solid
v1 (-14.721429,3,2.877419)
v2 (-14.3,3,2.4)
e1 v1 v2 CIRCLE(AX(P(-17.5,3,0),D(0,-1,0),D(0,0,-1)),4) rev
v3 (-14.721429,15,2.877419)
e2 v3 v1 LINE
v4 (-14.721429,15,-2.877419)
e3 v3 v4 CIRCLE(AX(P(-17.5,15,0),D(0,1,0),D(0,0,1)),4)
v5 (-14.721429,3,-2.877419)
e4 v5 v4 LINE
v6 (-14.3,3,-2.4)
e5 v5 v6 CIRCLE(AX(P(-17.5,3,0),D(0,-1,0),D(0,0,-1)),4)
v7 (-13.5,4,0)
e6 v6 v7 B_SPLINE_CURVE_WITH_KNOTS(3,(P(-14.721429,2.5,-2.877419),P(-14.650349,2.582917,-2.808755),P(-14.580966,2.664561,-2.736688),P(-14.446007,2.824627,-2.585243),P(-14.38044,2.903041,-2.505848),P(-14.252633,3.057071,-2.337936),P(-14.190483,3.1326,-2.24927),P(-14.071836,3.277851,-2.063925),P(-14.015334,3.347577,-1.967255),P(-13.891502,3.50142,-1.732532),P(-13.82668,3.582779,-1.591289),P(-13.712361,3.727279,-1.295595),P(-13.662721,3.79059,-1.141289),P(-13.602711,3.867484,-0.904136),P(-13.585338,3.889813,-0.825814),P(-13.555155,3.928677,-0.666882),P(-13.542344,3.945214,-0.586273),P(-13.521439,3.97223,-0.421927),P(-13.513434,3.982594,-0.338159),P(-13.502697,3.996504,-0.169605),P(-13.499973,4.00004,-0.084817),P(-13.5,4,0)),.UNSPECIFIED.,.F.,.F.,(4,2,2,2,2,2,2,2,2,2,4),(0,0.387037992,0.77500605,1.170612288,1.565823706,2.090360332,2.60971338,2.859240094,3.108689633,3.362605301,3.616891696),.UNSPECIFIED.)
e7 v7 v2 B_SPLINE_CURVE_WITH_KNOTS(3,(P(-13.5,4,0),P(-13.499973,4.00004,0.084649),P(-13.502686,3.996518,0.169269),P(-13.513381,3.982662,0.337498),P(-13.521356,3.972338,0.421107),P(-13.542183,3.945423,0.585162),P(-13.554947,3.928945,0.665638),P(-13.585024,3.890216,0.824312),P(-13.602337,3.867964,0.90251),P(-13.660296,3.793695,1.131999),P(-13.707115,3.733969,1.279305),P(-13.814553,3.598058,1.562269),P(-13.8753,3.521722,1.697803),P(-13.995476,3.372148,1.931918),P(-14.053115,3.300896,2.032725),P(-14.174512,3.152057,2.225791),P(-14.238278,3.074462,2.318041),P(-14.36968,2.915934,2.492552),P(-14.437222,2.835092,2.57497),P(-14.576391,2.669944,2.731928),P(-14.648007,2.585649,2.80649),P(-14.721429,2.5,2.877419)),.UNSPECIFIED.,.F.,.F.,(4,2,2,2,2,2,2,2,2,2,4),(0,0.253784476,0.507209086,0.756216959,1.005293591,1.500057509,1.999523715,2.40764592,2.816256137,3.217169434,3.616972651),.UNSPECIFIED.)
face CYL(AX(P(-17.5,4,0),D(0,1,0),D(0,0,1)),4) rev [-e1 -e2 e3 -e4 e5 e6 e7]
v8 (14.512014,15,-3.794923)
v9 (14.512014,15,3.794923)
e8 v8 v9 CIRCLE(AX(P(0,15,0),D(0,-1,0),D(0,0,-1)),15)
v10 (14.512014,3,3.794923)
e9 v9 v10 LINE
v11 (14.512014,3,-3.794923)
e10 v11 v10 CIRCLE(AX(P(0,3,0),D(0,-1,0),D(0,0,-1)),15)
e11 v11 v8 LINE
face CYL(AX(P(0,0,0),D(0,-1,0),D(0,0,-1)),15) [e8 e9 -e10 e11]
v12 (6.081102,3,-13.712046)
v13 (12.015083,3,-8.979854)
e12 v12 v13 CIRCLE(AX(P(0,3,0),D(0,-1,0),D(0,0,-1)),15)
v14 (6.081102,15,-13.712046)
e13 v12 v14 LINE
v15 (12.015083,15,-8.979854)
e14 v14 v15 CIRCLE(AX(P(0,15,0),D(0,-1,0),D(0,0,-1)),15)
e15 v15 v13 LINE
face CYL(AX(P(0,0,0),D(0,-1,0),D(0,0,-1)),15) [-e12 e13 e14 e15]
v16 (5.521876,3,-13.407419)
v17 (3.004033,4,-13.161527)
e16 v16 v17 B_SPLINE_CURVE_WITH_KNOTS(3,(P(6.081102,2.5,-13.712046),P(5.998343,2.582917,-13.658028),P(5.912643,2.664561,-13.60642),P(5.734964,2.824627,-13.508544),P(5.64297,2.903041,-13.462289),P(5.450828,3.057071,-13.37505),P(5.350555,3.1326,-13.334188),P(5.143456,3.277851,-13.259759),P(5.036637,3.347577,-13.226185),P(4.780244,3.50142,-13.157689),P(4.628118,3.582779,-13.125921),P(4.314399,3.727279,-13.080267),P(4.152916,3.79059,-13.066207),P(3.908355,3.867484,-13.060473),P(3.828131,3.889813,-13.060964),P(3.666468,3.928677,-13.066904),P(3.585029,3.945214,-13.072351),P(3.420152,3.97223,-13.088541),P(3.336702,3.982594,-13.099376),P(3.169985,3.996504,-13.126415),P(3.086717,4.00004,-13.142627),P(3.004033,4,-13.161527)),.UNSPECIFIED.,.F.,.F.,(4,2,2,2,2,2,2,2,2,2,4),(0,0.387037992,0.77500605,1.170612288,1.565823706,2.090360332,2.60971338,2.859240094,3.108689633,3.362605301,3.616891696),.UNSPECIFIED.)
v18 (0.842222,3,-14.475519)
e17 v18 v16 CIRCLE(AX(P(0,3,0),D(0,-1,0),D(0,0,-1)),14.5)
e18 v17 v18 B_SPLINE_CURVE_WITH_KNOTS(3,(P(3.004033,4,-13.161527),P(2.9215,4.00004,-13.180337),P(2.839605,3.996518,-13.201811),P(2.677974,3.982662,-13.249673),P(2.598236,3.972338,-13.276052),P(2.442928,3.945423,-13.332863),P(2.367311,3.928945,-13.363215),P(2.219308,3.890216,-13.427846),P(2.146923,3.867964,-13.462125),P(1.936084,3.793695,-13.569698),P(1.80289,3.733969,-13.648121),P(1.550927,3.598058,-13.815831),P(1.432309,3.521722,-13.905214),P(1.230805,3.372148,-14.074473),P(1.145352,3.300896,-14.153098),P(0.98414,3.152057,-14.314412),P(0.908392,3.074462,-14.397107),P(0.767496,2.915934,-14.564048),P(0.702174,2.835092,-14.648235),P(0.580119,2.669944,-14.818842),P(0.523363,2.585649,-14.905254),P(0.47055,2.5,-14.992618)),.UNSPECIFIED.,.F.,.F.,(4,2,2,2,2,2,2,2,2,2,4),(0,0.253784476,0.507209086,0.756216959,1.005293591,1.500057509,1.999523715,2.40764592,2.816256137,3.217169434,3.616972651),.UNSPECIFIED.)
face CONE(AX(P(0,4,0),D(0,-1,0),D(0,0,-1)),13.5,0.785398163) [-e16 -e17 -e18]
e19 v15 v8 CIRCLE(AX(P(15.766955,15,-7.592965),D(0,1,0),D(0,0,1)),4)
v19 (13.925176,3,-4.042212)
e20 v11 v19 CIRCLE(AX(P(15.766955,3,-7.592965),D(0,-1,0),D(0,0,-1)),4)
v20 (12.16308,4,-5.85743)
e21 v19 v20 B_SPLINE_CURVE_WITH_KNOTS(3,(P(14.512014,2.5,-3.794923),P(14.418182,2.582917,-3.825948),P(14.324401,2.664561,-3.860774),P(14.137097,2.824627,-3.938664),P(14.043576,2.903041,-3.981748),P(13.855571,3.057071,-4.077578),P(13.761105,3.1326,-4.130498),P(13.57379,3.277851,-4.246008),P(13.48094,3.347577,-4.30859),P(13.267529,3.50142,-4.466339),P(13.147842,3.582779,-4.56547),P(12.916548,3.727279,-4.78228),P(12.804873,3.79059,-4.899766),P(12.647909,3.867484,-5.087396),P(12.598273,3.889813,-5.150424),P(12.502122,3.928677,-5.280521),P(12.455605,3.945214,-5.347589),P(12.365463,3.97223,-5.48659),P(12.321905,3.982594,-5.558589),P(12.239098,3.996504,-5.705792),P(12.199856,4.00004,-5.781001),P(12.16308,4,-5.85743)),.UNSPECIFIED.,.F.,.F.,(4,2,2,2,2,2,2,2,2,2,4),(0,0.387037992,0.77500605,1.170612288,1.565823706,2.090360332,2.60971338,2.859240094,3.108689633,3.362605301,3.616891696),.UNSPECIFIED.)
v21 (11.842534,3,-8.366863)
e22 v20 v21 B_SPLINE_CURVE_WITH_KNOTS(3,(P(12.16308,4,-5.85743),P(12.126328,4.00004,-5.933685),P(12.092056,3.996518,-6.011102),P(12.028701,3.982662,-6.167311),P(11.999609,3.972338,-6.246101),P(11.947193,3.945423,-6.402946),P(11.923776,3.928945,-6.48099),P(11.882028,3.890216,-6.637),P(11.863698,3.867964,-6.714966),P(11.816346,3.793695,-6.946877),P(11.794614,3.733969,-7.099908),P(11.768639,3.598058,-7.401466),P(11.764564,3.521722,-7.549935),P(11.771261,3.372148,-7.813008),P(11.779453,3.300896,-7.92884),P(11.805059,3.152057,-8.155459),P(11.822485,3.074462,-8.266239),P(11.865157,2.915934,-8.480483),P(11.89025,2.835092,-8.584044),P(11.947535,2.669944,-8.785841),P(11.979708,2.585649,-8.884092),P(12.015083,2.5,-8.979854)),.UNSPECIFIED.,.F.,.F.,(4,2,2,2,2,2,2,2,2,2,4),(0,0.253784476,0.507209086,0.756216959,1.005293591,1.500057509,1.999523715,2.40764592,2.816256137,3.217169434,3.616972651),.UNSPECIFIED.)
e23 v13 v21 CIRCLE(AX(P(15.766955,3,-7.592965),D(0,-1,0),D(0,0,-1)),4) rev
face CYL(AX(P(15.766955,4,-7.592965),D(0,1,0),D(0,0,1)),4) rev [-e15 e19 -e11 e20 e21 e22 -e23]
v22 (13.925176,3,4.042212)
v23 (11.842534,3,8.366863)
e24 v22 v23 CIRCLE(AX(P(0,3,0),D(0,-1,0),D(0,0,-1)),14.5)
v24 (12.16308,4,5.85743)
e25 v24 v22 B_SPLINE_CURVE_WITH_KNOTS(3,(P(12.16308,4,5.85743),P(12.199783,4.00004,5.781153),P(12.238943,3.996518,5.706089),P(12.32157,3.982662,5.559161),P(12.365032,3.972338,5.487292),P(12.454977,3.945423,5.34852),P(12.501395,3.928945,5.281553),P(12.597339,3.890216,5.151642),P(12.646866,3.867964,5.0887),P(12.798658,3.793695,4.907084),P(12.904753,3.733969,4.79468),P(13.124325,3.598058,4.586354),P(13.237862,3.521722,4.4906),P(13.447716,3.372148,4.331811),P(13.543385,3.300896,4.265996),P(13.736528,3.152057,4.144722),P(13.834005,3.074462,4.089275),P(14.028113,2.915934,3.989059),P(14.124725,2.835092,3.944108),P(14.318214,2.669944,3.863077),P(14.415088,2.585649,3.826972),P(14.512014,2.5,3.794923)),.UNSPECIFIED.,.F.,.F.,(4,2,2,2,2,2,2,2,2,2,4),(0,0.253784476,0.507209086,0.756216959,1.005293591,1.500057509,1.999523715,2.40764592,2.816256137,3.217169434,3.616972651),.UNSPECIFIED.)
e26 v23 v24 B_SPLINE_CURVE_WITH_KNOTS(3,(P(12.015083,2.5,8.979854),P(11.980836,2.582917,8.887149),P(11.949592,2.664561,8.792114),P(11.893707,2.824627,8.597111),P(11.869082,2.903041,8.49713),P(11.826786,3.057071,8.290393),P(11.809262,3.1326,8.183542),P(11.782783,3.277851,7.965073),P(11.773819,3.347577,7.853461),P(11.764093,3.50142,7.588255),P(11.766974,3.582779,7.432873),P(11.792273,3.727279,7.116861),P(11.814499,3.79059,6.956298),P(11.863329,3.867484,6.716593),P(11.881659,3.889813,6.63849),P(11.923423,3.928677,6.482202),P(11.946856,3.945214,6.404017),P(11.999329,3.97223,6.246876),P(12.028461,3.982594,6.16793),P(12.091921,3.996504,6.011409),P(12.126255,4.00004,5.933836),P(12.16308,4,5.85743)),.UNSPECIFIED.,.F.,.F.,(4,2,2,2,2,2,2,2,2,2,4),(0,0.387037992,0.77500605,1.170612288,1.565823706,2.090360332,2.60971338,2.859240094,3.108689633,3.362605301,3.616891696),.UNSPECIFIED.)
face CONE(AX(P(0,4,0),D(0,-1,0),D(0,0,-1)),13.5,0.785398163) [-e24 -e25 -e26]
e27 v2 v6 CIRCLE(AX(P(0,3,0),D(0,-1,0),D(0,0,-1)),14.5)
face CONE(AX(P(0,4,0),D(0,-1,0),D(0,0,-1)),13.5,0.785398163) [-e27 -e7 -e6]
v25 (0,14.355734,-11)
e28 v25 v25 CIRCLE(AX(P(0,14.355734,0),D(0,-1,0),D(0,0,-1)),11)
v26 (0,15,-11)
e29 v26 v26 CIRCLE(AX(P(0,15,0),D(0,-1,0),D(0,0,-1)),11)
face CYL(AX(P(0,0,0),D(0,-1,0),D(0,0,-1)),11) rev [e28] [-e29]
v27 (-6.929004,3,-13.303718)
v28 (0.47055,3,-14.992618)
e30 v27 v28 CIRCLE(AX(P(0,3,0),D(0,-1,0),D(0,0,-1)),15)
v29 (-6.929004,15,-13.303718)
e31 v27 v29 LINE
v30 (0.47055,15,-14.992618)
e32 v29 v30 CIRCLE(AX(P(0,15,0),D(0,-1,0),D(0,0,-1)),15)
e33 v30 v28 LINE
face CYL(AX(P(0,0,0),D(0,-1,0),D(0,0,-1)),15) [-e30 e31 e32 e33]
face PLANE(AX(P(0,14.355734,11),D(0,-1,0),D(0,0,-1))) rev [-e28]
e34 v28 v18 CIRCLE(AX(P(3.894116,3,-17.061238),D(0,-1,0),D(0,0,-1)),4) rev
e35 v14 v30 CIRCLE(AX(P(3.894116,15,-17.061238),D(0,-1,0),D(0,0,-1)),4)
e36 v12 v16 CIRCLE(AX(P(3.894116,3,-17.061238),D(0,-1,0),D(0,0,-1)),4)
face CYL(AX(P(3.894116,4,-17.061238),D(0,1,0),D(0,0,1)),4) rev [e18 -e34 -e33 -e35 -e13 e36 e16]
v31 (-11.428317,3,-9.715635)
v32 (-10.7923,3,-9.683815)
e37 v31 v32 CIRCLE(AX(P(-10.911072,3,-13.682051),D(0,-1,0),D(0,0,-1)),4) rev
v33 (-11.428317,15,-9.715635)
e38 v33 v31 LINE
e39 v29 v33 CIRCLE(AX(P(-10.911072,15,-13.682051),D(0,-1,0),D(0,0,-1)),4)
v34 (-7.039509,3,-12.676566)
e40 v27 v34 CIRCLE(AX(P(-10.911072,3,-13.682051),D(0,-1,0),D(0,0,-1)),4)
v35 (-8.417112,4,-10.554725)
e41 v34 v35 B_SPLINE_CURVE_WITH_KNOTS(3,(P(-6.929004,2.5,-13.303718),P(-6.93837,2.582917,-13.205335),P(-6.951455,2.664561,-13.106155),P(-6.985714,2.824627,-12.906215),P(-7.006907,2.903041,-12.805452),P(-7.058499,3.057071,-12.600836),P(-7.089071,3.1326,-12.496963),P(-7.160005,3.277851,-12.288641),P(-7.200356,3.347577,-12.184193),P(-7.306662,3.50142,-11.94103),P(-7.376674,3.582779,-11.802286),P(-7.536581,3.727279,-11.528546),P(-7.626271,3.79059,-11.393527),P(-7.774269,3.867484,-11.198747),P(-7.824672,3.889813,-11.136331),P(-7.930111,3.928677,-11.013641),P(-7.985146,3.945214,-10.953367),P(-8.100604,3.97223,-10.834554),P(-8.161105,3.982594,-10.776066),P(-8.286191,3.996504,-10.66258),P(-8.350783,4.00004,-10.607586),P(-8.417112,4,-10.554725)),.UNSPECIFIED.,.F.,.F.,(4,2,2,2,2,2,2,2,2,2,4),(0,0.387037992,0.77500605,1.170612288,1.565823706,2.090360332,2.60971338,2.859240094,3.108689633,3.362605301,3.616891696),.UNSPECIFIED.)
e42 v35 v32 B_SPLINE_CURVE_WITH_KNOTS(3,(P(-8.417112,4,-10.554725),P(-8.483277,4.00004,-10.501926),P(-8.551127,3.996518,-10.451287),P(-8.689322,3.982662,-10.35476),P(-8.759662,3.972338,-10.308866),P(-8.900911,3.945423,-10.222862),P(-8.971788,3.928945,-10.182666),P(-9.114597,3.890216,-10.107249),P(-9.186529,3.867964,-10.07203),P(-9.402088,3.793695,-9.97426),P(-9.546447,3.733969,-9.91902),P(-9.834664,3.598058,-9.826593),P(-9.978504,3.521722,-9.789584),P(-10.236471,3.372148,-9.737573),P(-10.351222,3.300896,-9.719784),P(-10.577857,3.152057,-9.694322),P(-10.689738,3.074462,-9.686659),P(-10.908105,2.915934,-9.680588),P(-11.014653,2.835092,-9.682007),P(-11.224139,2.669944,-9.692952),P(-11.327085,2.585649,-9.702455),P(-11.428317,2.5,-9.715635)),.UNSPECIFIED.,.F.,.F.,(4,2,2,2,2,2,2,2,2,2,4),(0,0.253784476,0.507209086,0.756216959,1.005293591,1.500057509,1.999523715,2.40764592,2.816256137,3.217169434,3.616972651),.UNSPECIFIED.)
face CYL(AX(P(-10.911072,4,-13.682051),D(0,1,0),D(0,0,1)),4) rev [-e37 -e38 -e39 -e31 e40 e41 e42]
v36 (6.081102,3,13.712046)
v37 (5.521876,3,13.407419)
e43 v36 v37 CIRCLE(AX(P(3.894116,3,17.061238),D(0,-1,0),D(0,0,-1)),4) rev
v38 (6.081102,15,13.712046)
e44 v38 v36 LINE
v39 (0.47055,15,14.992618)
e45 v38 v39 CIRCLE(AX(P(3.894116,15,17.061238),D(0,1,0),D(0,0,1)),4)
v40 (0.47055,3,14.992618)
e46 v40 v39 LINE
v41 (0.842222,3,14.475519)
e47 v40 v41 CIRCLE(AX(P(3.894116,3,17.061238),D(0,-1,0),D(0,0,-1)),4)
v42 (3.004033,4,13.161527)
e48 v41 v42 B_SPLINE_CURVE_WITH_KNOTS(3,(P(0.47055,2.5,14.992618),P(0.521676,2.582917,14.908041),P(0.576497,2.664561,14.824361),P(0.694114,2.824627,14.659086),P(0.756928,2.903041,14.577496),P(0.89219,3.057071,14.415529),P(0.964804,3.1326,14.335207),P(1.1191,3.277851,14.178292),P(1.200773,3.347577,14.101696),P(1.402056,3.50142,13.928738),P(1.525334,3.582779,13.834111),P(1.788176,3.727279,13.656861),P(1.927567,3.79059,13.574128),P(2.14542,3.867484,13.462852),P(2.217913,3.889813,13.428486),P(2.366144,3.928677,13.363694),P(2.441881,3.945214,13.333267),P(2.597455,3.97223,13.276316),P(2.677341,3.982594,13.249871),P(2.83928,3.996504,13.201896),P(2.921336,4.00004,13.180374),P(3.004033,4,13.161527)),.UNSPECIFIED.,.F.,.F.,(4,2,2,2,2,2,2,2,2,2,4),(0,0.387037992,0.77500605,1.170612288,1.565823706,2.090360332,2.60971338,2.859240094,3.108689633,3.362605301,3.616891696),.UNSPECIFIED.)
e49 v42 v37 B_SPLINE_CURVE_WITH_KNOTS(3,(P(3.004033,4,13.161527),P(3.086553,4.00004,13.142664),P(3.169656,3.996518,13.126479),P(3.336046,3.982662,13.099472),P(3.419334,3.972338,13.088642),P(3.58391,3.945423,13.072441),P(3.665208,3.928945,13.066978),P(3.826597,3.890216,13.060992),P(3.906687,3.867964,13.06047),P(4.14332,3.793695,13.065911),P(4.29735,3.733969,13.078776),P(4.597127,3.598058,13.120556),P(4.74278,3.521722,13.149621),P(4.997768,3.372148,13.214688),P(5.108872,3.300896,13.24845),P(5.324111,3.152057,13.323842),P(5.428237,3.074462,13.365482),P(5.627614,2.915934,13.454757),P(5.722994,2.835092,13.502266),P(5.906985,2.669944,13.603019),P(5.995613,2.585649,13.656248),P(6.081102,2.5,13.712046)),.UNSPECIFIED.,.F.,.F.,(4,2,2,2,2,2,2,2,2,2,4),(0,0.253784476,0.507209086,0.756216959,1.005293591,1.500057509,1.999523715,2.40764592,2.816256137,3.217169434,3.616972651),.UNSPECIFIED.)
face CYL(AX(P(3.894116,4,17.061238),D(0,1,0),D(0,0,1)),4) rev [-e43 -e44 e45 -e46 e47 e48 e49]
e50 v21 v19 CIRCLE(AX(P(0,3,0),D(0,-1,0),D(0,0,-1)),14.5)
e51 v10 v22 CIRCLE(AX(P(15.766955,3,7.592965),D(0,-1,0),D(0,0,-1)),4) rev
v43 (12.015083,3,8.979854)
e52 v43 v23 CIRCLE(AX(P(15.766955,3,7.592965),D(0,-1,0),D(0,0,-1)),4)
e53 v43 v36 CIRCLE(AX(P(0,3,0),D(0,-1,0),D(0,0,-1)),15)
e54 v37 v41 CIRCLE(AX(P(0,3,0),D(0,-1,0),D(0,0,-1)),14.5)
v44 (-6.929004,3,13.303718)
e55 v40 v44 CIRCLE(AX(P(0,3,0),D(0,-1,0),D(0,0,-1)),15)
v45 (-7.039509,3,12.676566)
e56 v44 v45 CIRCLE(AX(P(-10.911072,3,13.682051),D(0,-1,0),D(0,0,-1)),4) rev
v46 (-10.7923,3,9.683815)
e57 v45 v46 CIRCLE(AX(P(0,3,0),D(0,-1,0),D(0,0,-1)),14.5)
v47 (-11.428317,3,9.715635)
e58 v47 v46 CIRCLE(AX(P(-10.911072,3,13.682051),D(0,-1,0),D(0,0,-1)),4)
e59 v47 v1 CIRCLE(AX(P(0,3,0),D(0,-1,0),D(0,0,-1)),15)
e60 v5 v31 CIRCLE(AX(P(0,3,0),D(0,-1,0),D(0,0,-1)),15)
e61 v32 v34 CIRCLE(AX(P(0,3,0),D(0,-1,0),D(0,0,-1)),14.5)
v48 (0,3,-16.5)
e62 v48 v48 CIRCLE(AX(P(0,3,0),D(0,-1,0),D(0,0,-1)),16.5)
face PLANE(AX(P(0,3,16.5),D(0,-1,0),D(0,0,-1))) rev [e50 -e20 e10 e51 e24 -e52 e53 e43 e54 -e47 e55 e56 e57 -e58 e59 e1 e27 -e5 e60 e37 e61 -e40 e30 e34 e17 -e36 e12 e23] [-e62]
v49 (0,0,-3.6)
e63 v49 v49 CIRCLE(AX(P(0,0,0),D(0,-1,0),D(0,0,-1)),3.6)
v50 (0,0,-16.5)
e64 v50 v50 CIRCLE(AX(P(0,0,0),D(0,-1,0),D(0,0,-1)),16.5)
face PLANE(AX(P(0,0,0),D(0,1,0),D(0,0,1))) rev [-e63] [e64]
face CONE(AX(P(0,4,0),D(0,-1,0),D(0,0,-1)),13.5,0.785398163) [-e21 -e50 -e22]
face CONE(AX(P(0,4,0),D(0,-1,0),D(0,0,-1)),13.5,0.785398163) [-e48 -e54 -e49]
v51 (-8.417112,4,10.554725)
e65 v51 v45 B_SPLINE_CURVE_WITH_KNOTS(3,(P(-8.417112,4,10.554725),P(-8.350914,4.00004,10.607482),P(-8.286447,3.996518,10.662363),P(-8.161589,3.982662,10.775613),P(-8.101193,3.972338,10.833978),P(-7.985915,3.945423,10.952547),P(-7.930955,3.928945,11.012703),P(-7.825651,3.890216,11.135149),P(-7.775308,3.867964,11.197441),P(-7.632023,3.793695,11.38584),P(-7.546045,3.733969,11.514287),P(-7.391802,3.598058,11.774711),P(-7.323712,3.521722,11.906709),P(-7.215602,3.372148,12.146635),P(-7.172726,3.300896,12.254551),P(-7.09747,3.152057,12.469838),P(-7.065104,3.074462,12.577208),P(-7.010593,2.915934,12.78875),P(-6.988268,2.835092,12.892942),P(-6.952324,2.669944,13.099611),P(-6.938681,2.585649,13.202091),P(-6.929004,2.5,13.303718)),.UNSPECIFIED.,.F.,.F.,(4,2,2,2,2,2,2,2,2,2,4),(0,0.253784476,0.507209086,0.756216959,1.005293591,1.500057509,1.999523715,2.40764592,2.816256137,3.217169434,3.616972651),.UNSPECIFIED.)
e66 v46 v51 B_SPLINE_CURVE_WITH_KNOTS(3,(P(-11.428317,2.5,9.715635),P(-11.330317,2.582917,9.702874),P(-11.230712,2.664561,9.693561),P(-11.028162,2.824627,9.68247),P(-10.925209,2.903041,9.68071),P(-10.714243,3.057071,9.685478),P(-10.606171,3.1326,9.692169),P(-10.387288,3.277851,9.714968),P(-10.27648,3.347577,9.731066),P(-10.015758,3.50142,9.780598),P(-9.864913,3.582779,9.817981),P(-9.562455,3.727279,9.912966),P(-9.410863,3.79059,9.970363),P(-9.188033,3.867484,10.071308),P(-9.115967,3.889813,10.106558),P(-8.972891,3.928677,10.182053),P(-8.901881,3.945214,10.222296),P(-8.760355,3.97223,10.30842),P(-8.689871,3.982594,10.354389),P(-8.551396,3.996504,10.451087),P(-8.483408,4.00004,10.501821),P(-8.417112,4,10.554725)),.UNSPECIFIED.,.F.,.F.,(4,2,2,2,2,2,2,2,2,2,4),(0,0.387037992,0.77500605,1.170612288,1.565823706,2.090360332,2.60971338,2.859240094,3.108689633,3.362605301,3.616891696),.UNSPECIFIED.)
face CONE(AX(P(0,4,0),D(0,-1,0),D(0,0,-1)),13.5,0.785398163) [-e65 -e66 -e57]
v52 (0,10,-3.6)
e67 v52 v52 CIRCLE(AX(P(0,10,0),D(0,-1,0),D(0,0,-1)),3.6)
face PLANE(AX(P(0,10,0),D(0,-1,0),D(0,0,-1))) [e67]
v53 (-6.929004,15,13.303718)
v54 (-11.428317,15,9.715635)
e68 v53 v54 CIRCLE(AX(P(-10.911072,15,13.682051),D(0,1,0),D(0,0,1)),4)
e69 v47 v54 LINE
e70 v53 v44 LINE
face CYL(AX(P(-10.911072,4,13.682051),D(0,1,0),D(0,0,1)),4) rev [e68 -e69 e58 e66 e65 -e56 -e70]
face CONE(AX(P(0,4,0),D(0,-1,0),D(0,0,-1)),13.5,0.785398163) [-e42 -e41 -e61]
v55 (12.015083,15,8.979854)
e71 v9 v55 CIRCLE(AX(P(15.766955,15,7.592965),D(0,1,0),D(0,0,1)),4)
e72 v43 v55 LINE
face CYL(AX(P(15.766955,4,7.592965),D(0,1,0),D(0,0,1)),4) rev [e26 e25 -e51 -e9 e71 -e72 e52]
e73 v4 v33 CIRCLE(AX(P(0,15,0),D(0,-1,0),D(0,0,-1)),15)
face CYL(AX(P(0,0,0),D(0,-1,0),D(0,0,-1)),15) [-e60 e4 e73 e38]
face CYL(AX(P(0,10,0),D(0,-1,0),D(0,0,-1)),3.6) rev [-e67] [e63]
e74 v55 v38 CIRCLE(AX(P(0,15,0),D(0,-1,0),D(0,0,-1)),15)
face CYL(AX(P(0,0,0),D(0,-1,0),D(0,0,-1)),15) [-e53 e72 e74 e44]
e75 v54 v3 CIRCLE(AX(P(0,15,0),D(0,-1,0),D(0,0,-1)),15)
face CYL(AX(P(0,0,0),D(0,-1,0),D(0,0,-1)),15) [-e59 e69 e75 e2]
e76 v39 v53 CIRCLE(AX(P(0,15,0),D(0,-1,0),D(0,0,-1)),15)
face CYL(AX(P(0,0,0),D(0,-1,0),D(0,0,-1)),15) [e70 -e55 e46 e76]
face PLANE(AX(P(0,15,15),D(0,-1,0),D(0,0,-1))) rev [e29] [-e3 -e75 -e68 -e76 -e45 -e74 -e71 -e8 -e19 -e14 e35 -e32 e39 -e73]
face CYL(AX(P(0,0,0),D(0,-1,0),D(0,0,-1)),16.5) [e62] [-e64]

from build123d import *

# Parameters (mm, degrees)
SKETCH2_R          = 3.6
CUT_EXTRUDE1_DEPTH = 10
SKETCH3_R          = 4
CUT_EXTRUDE2_DEPTH = 11
CHAMFER1_SIZE      = 1.5


with BuildPart() as part:
    # Sketch1 → Revolve1 (revolve)
    with BuildSketch(Plane(origin=(0, 0, 0), x_dir=(0, 0, -1), z_dir=(1, 0, 0)), mode=Mode.PRIVATE) as revolve1_sk:
        Polygon((0, 0), (-16.5, 0), (-16.5, 3), (-15, 3), (-15, 15), (-11, 15), (-11, 14.355733533), (0, 14.355733533), align=None)
    revolve(revolve1_sk.sketch.rotate(Axis((0, 0, 0), (0, 1, 0)), 180), axis=Axis((0, 0, 0), (0, 1, 0)))

    # Sketch2 → Cut-Extrude1 (cut)
    with BuildSketch(Plane.XZ):
        with Locations(Location((0, 0, 0), (0, 0, 270))):
            Circle(SKETCH2_R)
    extrude(amount=-CUT_EXTRUDE1_DEPTH, mode=Mode.SUBTRACT)

    # Sketch3 → Cut-Extrude2 (cut)
    with BuildSketch(Plane(origin=(0, 15, 0), x_dir=(1, 0, 0), z_dir=(0, 1, 0))):
        with Locations((-17.5, 0)):
            Circle(SKETCH3_R)
        with Locations((-10.911071533, 13.682050943)):
            Circle(SKETCH3_R)
        with Locations((3.894116344, 17.061238463)):
            Circle(SKETCH3_R)
        with Locations((15.766955188, 7.592965435)):
            Circle(SKETCH3_R)
        with Locations((15.766955188, -7.592965435)):
            Circle(SKETCH3_R)
        with Locations((3.894116344, -17.061238463)):
            Circle(SKETCH3_R)
        with Locations((-10.911071533, -13.682050943)):
            Circle(SKETCH3_R)
    extrude(amount=-CUT_EXTRUDE2_DEPTH, mode=Mode.SUBTRACT)

    # Chamfer1
    # the kernel refuses this chamfer: 1.5 mm, written as the material it takes off along each edge
    with BuildSketch(Plane(origin=(0, 4, 0), x_dir=(-0.22388554303077474, 0, 0.974615443968448), z_dir=(-0.974615443968448, 0, -0.22388554303077474))) as chamfer1_piece_1_section:
        Polygon((15, -CHAMFER1_SIZE), (15 - CHAMFER1_SIZE, 0), (15, 0), align=None)
    chamfer1_piece_1 = revolve(axis=Axis((0, 4, 0), (0, 1, 0)), revolution_arc=51.588991206, mode=Mode.PRIVATE)
    chamfer1_piece_1 = split(chamfer1_piece_1, bisect_by=Plane(origin=(3.219301063, 3, 14.104691916), z_dir=(0, 1, 0)), keep=Keep.TOP, mode=Mode.PRIVATE)
    chamfer1_piece_1 = chamfer1_piece_1 & Plane(origin=(3.894116344, 3.575453248, 17.061238463), x_dir=(1, 0, 0), z_dir=(0, 1, 0)) * Cylinder(4, 60, mode=Mode.PRIVATE)
    add(chamfer1_piece_1, mode=Mode.SUBTRACT)
    with BuildSketch(Plane(origin=(0, 4, 0), x_dir=(-0.9015753902573829, 0, 0.43262202403743605), z_dir=(-0.43262202403743605, 0, -0.9015753902573829))) as chamfer1_piece_2_section:
        Polygon((15, -CHAMFER1_SIZE), (15 - CHAMFER1_SIZE, 0), (15, 0), align=None)
    chamfer1_piece_2 = revolve(axis=Axis((0, 4, 0), (0, 1, 0)), revolution_arc=51.588991206, mode=Mode.PRIVATE)
    chamfer1_piece_2 = split(chamfer1_piece_2, bisect_by=Plane(origin=(-9.020290662, 3, 11.311082492), z_dir=(0, 1, 0)), keep=Keep.TOP, mode=Mode.PRIVATE)
    chamfer1_piece_2 = chamfer1_piece_2 & Plane(origin=(-10.911071533, 3.575453183, 13.682050943), x_dir=(1, 0, 0), z_dir=(0, 1, 0)) * Cylinder(4, 60, mode=Mode.PRIVATE)
    add(chamfer1_piece_2, mode=Mode.SUBTRACT)
    with BuildSketch(Plane(origin=(0, 4, 0), x_dir=(-0.9003605798337992, 0, -0.4351446038747863), z_dir=(0.4351446038747863, 0, -0.9003605798337992))) as chamfer1_piece_3_section:
        Polygon((15, -CHAMFER1_SIZE), (15 - CHAMFER1_SIZE, 0), (15, 0), align=None)
    chamfer1_piece_3 = revolve(axis=Axis((0, 4, 0), (0, 1, 0)), revolution_arc=51.588991206, mode=Mode.PRIVATE)
    chamfer1_piece_3 = split(chamfer1_piece_3, bisect_by=Plane(origin=(-14.467418648, 3, -5.57e-07), z_dir=(0, 1, 0)), keep=Keep.TOP, mode=Mode.PRIVATE)
    chamfer1_piece_3 = chamfer1_piece_3 & Plane(origin=(-17.5, 3.575453666, 0), x_dir=(1, 0, 0), z_dir=(0, 1, 0)) * Cylinder(4, 60, mode=Mode.PRIVATE)
    add(chamfer1_piece_3, mode=Mode.SUBTRACT)
    with BuildSketch(Plane(origin=(0, 4, 0), x_dir=(-0.2211558887866005, 0, -0.9752384697370221), z_dir=(0.9752384697370221, 0, -0.2211558887866005))) as chamfer1_piece_4_section:
        Polygon((15, -CHAMFER1_SIZE), (15 - CHAMFER1_SIZE, 0), (15, 0), align=None)
    chamfer1_piece_4 = revolve(axis=Axis((0, 4, 0), (0, 1, 0)), revolution_arc=51.588991206, mode=Mode.PRIVATE)
    chamfer1_piece_4 = split(chamfer1_piece_4, bisect_by=Plane(origin=(-9.020286489, 3, -11.311086109), z_dir=(0, 1, 0)), keep=Keep.TOP, mode=Mode.PRIVATE)
    chamfer1_piece_4 = chamfer1_piece_4 & Plane(origin=(-10.911071533, 3.575453389, -13.682050943), x_dir=(1, 0, 0), z_dir=(0, 1, 0)) * Cylinder(4, 60, mode=Mode.PRIVATE)
    add(chamfer1_piece_4, mode=Mode.SUBTRACT)
    with BuildSketch(Plane(origin=(0, 4, 0), x_dir=(0.6245836972749009, 0, -0.7809578766479117), z_dir=(0.7809578766479117, 0, 0.6245836972749009))) as chamfer1_piece_5_section:
        Polygon((15, -CHAMFER1_SIZE), (15 - CHAMFER1_SIZE, 0), (15, 0), align=None)
    chamfer1_piece_5 = revolve(axis=Axis((0, 4, 0), (0, 1, 0)), revolution_arc=51.588991206, mode=Mode.PRIVATE)
    chamfer1_piece_5 = split(chamfer1_piece_5, bisect_by=Plane(origin=(3.219306774, 3, -14.104690845), z_dir=(0, 1, 0)), keep=Keep.TOP, mode=Mode.PRIVATE)
    chamfer1_piece_5 = chamfer1_piece_5 & Plane(origin=(3.894116344, 3.575453353, -17.061238463), x_dir=(1, 0, 0), z_dir=(0, 1, 0)) * Cylinder(4, 60, mode=Mode.PRIVATE)
    add(chamfer1_piece_5, mode=Mode.SUBTRACT)
    with BuildSketch(Plane(origin=(0, 4, 0), x_dir=(0.9999990201028447, 0, 0.001399926194576086), z_dir=(-0.001399926194576086, 0, 0.9999990201028447))) as chamfer1_piece_6_section:
        Polygon((15, -CHAMFER1_SIZE), (15 - CHAMFER1_SIZE, 0), (15, 0), align=None)
    chamfer1_piece_6 = revolve(axis=Axis((0, 4, 0), (0, 1, 0)), revolution_arc=51.588991206, mode=Mode.PRIVATE)
    chamfer1_piece_6 = split(chamfer1_piece_6, bisect_by=Plane(origin=(13.034696257, 3, -6.2771755), z_dir=(0, 1, 0)), keep=Keep.TOP, mode=Mode.PRIVATE)
    chamfer1_piece_6 = chamfer1_piece_6 & Plane(origin=(15.766955188, 3.575453245, -7.592965435), x_dir=(1, 0, 0), z_dir=(0, 1, 0)) * Cylinder(4, 60, mode=Mode.PRIVATE)
    add(chamfer1_piece_6, mode=Mode.SUBTRACT)
    with BuildSketch(Plane(origin=(0, 4, 0), x_dir=(0.622394684530797, 0, 0.782703556059259), z_dir=(-0.782703556059259, 0, 0.622394684530797))) as chamfer1_piece_7_section:
        Polygon((15, -CHAMFER1_SIZE), (15 - CHAMFER1_SIZE, 0), (15, 0), align=None)
    chamfer1_piece_7 = revolve(axis=Axis((0, 4, 0), (0, 1, 0)), revolution_arc=51.588991206, mode=Mode.PRIVATE)
    chamfer1_piece_7 = split(chamfer1_piece_7, bisect_by=Plane(origin=(13.03469369, 3, 6.277180857), z_dir=(0, 1, 0)), keep=Keep.TOP, mode=Mode.PRIVATE)
    chamfer1_piece_7 = chamfer1_piece_7 & Plane(origin=(15.766955188, 3.575453554, 7.592965435), x_dir=(1, 0, 0), z_dir=(0, 1, 0)) * Cylinder(4, 61, mode=Mode.PRIVATE)
    add(chamfer1_piece_7, mode=Mode.SUBTRACT)


solid = part.part
